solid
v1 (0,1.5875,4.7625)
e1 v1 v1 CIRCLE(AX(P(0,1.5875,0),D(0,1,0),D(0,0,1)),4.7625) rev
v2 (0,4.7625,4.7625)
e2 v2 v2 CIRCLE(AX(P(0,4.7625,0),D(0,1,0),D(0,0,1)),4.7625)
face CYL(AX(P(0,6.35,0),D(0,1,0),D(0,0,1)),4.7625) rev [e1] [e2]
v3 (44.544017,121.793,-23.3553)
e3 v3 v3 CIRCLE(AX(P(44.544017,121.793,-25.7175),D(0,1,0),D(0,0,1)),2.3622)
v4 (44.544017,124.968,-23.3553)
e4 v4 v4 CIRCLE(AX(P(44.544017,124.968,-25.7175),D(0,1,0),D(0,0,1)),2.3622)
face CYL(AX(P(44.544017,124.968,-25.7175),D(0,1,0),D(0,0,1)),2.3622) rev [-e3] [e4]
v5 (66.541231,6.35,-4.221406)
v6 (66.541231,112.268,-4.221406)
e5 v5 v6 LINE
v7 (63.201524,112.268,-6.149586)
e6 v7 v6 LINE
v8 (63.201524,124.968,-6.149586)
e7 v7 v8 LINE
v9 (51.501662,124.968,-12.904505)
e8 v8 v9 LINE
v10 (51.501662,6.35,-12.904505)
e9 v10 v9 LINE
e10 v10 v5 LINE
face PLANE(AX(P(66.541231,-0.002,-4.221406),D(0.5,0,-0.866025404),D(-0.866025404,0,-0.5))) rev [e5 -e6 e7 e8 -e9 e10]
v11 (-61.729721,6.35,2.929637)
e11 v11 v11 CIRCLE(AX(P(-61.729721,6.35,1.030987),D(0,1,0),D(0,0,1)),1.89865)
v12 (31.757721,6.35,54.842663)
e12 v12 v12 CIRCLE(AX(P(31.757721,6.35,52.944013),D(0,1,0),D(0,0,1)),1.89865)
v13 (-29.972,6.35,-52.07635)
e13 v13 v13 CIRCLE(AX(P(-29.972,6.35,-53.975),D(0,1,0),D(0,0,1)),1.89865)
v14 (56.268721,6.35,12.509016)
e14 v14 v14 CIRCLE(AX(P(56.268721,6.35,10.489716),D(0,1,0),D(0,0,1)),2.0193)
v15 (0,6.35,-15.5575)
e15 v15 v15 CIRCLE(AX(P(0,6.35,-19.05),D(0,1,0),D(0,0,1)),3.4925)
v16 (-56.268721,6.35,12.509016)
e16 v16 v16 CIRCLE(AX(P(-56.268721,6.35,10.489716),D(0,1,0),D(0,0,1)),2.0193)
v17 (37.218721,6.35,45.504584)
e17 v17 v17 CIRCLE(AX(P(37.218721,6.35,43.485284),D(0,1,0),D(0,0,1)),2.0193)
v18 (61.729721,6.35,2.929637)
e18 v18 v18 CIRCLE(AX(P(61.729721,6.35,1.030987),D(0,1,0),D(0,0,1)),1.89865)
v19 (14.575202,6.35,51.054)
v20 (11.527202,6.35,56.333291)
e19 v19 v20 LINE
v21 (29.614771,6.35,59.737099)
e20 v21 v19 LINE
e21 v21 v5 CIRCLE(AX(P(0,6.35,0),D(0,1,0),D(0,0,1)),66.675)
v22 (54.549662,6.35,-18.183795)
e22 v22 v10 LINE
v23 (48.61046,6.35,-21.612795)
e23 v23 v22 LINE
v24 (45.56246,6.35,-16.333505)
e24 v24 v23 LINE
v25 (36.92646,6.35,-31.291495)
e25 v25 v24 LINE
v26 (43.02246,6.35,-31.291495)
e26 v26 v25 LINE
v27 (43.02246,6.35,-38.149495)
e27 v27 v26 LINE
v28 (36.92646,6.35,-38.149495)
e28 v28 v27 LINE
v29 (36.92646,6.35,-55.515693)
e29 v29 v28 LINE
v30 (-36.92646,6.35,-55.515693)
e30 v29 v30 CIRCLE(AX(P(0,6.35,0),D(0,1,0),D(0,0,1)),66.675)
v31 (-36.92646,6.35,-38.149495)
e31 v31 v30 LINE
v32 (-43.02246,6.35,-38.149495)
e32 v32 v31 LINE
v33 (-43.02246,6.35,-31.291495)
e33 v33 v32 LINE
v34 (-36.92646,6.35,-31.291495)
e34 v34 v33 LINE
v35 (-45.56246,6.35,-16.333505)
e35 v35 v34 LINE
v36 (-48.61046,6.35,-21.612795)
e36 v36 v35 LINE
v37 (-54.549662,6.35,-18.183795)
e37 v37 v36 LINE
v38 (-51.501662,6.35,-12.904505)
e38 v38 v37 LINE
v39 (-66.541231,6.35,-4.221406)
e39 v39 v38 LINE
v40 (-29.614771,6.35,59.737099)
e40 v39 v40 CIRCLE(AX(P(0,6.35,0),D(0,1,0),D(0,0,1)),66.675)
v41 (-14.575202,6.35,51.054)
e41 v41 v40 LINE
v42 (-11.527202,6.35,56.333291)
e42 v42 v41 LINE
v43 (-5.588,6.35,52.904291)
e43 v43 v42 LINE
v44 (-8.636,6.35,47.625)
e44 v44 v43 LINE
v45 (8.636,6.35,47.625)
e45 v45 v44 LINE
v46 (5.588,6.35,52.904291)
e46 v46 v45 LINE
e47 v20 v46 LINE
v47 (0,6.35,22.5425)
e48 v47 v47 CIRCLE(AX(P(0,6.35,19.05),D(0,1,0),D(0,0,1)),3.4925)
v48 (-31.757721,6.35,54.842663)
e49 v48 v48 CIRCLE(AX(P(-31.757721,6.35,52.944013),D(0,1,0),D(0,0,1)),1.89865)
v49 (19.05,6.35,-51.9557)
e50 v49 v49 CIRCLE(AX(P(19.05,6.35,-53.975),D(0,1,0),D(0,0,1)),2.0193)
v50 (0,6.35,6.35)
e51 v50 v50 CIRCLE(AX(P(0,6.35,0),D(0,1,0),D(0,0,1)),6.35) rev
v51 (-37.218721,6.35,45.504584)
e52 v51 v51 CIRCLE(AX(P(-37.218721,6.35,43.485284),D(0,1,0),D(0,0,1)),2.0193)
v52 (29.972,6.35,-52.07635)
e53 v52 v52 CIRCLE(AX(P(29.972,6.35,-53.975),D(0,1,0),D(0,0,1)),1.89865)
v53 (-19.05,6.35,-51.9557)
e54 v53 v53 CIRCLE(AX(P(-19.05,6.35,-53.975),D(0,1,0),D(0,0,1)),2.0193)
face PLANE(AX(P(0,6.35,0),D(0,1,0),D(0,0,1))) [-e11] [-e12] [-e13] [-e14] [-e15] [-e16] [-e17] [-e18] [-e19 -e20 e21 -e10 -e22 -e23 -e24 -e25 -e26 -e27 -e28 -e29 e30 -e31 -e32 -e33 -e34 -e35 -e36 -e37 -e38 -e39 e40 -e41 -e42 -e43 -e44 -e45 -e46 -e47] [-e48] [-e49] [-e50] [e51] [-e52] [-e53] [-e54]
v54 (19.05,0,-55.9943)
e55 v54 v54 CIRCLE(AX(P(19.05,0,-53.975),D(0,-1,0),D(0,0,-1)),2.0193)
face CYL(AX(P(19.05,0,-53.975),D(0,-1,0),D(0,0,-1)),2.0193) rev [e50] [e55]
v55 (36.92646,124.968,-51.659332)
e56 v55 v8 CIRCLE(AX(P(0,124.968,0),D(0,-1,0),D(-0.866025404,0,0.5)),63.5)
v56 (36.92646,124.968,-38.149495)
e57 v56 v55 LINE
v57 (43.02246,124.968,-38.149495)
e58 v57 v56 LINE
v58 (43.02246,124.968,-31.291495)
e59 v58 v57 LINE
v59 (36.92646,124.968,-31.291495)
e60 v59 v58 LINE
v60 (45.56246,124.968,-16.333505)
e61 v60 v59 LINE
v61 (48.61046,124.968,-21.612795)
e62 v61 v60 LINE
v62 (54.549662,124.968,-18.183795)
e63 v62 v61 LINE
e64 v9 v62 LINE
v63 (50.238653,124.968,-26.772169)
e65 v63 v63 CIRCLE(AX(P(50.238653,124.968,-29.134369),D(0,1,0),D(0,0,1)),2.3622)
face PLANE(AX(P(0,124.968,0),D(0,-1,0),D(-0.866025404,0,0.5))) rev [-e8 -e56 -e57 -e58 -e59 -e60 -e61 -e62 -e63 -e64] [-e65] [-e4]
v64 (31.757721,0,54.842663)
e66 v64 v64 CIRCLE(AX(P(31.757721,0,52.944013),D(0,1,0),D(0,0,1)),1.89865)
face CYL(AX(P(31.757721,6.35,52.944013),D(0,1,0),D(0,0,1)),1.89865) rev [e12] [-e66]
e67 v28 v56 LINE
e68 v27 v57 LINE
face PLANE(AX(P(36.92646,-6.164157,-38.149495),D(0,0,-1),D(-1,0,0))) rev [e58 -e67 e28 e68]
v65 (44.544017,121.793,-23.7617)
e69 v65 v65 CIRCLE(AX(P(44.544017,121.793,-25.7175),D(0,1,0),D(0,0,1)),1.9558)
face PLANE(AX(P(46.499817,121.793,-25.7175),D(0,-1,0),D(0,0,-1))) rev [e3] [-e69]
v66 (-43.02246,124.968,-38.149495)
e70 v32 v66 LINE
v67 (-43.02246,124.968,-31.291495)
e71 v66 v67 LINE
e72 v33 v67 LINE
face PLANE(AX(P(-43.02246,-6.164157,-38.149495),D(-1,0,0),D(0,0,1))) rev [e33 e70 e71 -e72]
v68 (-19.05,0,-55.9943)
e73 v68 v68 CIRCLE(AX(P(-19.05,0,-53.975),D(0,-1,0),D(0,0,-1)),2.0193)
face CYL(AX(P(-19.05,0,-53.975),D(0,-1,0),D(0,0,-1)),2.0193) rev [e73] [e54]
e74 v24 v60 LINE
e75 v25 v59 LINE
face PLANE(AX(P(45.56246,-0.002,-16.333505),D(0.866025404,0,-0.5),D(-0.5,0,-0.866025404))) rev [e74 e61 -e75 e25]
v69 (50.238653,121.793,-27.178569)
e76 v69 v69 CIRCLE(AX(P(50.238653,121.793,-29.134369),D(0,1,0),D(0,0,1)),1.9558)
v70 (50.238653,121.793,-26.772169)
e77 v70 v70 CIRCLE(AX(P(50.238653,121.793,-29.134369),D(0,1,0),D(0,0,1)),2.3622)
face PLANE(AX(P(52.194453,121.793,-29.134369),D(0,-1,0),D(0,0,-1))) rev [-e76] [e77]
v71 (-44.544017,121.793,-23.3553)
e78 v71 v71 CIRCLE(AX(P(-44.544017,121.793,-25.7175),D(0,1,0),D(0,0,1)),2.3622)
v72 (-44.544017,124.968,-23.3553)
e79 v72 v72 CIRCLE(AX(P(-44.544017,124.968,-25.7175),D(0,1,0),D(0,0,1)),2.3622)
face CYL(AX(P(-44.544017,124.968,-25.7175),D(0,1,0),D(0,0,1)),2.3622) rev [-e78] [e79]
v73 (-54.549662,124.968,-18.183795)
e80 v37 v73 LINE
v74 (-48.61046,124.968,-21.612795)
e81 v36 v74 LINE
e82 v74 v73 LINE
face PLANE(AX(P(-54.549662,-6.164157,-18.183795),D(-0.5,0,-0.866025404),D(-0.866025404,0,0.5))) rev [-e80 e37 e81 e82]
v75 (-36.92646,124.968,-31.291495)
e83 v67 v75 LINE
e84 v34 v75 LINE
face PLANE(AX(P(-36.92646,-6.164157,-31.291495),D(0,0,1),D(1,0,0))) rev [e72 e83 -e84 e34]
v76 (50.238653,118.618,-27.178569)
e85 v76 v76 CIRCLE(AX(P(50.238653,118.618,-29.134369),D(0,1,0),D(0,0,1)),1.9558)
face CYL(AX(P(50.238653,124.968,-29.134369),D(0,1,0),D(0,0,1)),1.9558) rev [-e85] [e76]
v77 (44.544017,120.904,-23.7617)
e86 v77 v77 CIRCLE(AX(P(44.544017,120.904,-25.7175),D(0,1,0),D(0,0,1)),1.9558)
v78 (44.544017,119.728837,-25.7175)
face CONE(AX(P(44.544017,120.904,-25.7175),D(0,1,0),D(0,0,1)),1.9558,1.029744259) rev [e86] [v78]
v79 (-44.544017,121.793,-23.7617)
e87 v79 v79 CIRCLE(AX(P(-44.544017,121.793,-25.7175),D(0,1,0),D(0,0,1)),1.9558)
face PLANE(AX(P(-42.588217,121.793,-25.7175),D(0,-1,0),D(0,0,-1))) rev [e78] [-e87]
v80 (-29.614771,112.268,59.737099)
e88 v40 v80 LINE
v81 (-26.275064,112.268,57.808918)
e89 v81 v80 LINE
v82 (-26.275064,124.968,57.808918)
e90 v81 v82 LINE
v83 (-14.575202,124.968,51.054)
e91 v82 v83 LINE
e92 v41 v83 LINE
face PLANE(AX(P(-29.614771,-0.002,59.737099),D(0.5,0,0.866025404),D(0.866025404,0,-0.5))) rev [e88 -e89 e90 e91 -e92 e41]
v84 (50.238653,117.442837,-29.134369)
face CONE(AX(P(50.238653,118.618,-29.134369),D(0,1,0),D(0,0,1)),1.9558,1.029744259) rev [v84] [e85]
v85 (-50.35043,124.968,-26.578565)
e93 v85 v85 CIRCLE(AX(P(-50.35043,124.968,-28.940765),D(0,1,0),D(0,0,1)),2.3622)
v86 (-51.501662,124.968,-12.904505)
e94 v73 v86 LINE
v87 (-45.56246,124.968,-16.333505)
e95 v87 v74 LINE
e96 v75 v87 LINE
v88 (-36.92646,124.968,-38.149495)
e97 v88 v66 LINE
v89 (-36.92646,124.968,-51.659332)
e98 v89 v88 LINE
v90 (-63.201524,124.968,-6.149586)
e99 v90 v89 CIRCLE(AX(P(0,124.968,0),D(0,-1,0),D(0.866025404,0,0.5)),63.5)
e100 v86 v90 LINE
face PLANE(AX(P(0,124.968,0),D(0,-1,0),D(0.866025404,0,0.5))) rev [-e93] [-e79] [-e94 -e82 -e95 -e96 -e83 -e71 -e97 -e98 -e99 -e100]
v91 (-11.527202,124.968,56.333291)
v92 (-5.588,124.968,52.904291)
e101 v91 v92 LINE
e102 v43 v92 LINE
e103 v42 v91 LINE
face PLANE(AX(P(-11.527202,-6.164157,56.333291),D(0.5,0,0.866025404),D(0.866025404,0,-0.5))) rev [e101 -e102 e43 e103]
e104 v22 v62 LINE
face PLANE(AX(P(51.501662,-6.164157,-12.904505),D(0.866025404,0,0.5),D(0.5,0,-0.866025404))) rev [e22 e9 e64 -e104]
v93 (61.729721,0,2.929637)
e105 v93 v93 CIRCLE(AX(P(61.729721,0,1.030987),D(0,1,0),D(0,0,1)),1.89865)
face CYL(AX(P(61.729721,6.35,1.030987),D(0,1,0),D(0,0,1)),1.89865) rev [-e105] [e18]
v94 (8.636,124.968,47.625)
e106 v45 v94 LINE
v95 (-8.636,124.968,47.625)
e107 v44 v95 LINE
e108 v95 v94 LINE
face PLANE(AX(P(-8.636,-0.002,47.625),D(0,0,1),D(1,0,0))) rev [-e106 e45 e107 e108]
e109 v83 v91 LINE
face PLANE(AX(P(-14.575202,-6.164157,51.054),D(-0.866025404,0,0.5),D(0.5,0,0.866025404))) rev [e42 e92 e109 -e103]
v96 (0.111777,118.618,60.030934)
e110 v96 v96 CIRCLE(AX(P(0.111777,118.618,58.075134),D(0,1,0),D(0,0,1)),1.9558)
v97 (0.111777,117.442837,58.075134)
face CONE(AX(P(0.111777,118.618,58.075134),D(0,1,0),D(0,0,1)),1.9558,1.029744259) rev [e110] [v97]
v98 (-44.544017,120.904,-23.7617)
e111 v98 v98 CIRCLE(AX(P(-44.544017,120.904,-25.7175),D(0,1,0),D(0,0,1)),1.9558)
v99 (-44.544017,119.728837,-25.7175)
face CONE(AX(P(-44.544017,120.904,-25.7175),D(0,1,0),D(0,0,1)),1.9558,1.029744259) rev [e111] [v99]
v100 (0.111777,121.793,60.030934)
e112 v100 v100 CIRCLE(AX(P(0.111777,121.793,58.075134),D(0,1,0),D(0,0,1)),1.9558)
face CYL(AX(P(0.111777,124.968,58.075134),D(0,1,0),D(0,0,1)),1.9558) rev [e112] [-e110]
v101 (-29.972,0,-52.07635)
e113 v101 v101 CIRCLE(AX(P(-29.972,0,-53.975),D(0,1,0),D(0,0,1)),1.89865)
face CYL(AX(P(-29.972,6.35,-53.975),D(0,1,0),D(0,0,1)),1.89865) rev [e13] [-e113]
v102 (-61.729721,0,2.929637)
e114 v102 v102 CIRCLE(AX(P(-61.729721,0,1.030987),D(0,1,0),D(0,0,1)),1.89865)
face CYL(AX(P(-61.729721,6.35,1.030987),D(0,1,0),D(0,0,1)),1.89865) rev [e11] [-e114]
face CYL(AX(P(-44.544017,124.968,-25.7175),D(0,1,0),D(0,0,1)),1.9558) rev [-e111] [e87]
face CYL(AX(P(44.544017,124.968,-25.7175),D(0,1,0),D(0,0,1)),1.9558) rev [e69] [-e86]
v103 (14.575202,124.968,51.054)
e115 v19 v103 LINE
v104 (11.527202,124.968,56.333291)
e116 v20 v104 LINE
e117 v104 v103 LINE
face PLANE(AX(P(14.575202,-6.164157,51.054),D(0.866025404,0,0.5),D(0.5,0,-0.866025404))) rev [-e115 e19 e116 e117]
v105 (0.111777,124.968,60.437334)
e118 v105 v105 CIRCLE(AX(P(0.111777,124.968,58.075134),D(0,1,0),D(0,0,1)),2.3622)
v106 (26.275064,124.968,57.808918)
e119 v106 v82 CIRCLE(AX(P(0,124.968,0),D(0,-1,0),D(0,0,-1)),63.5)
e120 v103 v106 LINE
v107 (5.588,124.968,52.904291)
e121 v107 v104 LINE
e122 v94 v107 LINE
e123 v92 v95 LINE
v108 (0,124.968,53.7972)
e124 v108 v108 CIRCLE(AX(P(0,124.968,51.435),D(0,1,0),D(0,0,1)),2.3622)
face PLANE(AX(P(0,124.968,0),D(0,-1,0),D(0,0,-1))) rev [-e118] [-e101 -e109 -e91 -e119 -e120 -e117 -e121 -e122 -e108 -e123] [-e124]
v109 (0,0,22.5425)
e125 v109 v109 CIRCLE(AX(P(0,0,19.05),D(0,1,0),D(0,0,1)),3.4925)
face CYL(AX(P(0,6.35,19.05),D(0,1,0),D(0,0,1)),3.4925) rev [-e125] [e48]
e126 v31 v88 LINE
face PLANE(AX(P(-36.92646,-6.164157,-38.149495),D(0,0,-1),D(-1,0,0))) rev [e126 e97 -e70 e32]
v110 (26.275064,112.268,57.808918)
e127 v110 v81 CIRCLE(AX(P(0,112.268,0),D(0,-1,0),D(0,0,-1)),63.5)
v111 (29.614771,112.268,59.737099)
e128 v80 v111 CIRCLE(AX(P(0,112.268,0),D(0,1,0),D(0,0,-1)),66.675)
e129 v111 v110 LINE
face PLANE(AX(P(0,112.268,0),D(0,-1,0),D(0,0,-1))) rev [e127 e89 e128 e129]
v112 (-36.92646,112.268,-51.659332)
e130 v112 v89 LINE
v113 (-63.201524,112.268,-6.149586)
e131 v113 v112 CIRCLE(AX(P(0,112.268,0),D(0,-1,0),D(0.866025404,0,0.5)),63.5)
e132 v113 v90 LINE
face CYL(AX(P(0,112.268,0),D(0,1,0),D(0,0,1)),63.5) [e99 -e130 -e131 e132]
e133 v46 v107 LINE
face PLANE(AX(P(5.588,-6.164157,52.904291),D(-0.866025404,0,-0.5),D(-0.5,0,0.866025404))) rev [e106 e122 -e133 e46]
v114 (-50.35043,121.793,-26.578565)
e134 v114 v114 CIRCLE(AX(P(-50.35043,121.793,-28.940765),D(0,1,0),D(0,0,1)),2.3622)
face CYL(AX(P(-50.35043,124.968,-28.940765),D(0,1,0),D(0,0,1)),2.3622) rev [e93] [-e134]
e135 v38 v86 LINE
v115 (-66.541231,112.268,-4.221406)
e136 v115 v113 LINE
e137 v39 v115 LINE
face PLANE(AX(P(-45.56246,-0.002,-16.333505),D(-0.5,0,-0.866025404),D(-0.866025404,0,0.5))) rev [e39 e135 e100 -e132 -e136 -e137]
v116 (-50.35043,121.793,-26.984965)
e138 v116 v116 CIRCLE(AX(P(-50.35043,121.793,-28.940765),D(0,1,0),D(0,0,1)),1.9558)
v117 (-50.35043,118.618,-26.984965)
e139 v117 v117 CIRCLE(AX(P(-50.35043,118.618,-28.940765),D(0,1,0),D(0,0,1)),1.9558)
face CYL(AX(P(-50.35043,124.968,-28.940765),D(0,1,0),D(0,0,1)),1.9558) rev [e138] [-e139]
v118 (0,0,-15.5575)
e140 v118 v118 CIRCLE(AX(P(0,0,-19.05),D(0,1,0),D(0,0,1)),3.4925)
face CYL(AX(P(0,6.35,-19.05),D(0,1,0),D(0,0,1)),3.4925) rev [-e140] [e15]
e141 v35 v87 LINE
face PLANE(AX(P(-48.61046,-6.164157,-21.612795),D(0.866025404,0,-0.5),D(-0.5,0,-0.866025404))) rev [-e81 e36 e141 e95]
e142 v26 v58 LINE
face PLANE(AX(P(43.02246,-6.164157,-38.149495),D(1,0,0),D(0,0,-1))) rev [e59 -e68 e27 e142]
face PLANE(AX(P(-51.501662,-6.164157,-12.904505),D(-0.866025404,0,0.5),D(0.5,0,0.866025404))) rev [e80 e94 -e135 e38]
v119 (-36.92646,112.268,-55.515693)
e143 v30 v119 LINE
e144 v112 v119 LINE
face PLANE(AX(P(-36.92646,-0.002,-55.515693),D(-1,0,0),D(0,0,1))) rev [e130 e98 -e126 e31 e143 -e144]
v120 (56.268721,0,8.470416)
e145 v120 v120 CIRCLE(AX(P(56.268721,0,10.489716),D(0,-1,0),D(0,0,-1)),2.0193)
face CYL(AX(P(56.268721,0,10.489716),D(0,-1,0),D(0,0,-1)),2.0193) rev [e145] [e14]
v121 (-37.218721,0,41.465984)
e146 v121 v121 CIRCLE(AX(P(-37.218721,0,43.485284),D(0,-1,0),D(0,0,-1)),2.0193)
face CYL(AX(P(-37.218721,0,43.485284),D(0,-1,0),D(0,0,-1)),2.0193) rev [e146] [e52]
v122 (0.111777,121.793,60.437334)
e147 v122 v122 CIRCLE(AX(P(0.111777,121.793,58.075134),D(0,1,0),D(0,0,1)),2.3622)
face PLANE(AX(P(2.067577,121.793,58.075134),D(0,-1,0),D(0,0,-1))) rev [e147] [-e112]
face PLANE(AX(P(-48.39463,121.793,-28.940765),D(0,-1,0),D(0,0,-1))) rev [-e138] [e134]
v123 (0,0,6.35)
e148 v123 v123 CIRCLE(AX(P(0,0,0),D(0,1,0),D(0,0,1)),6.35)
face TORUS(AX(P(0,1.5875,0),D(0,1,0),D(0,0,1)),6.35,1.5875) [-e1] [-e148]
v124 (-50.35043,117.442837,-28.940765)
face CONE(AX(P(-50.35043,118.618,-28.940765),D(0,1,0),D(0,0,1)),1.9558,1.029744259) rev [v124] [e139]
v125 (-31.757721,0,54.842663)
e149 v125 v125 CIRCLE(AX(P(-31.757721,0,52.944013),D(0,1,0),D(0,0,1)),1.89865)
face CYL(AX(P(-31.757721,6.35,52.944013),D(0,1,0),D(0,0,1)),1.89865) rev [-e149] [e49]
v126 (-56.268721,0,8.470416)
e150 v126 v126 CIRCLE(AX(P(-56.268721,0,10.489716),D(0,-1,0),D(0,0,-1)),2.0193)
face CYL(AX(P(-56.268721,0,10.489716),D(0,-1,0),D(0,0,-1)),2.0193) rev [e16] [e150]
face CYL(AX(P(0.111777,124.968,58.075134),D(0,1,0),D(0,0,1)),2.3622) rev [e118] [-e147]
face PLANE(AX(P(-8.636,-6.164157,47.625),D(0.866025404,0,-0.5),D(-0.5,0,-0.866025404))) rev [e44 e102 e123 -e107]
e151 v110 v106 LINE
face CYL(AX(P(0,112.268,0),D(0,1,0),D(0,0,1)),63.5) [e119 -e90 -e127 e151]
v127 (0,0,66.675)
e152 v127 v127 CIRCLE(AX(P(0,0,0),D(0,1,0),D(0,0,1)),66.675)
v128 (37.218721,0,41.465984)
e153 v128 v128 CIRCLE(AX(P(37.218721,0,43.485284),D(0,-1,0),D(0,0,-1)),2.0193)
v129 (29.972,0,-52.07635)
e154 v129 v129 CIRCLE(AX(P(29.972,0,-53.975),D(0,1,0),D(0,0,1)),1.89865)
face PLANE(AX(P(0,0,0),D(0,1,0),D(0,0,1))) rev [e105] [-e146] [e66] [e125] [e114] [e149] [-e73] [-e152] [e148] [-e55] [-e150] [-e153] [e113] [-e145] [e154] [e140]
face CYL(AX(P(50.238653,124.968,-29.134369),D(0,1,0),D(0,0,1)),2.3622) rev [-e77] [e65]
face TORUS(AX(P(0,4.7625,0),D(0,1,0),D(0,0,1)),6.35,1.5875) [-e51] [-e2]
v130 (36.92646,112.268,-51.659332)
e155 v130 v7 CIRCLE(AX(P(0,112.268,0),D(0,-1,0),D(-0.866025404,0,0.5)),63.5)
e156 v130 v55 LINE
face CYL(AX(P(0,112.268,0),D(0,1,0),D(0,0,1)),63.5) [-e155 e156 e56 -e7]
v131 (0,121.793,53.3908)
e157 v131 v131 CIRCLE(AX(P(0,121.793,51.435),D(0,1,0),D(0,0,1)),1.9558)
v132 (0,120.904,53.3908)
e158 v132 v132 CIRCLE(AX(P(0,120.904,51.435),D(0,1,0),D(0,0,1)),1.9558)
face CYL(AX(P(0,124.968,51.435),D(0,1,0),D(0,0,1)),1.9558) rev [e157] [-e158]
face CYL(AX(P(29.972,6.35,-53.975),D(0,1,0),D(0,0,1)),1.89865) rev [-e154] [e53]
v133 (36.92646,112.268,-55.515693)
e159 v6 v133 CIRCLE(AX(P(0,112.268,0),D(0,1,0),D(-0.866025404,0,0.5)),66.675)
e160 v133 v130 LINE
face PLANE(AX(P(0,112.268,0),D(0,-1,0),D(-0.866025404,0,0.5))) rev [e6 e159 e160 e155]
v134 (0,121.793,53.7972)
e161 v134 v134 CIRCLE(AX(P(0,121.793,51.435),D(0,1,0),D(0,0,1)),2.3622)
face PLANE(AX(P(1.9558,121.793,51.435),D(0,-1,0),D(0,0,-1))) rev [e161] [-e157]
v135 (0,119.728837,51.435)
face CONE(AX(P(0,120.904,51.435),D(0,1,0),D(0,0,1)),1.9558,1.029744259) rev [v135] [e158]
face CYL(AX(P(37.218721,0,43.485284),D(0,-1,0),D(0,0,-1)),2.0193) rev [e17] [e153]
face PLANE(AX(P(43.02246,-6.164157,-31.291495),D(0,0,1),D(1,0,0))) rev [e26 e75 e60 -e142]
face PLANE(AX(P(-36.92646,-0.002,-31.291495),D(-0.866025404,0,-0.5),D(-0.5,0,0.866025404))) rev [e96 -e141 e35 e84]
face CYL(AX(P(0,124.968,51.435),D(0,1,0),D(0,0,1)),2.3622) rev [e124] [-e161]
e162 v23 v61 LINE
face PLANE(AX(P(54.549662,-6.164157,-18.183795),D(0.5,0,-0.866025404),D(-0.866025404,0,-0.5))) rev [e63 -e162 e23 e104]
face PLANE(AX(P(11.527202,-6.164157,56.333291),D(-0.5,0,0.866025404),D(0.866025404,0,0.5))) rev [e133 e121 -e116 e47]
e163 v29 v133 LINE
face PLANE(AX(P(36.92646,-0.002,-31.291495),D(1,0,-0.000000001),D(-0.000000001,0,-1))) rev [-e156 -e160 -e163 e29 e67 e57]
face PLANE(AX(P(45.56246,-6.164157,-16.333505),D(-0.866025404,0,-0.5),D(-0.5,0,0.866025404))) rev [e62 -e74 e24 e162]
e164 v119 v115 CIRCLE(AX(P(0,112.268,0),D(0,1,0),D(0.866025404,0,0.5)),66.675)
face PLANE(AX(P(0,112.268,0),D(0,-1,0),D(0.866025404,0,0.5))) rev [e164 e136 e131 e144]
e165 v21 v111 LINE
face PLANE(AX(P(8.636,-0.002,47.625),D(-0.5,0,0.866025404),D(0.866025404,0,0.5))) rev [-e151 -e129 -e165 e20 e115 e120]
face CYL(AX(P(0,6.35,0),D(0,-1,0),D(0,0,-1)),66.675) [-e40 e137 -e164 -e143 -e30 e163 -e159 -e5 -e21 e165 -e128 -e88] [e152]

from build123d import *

# Parameters (mm, degrees)
SKETCH1_R             = 66.675
BOSS_EXTRUDE1_DEPTH   = 6.35
BOSS_EXTRUDE2_REACH   = 240.306
CIRPATTERN1_COUNT     = 3
CUT_EXTRUDE1_DEPTH    = 118.618
CIRPATTERN2_COUNT     = 3
CUT_EXTRUDE2_DEPTH    = 12.7
CIRPATTERN3_COUNT     = 3
HOLE1_D               = 4.0386
CIRPATTERN4_OUTLINE_R = 2.0193
CIRPATTERN4_DEPTH     = 6.35
HOLE2_D               = 9.525
FILLET1_R             = 1.5875
HOLE3_D               = 6.985
CIRPATTERN5_COUNT     = 3
HOLE5_D               = 3.7973
CIRPATTERN6_COUNT     = 3
CIRPATTERN7_COUNT     = 3


# Read off the part's stored shape, not the designer's step: CirPattern4
with BuildPart() as part:
    # Sketch1 → Boss-Extrude1 (new body)
    with BuildSketch(Plane(origin=(0, 0, 0), x_dir=(1, 0, 0), z_dir=(0, 1, 0))):
        with Locations(Location((0, 0, 0), (0, 0, 270))):
            Circle(SKETCH1_R)
    extrude(amount=BOSS_EXTRUDE1_DEPTH)

    # Sketch2 → Boss-Extrude2 (add, up to next)
    with BuildSketch(Plane(origin=(0, 124.968, -124.968), x_dir=(1, 0, 0), z_dir=(0, -1, 0)), mode=Mode.PRIVATE) as boss_extrude2_sk1:
        with BuildLine():
            Line((-29.614770643, 184.705098882), (-8.635999998, 172.593000013))
            Line((-8.635999998, 172.593000013), (8.636000002, 172.593000013))
            Line((8.636000002, 172.593000013), (29.61477065, 184.705098878))
            ThreePointArc((29.61477065, 184.705098878), (4e-09, 191.642999985), (-29.614770643, 184.705098882))
        make_face()
    boss_extrude2_tool1 = extrude(boss_extrude2_sk1.sketch, amount=BOSS_EXTRUDE2_REACH, mode=Mode.PRIVATE) - part.part
    boss_extrude2 = boss_extrude2_tool1.solids().sort_by_distance((0, 124.968, 57.682703))[0]
    add(boss_extrude2)

    # CirPattern1: Boss-Extrude2 ×3 about axis
    cirpattern1_axis = Axis((0, 0, 0), (0, 1, 0))
    for i in range(1, CIRPATTERN1_COUNT):
        add(boss_extrude2.rotate(cirpattern1_axis, i * 360 / CIRPATTERN1_COUNT))

    # Sketch4 → Cut-Extrude1 (cut)
    with BuildSketch(Plane(origin=(0, 124.968, 0), x_dir=(1, 0, 0), z_dir=(0, 1, 0))):
        Polygon((14.575202222, -51.054000013), (11.527202222, -56.333290875), (5.588000002, -52.904290875), (8.636000002, -47.625000013), align=None)
        Polygon((-14.575202225, -51.054000007), (-8.635999998, -47.625000013), (-5.587999998, -52.904290875), (-11.527202221, -56.333290877), align=None)
    cut_extrude1 = extrude(amount=-CUT_EXTRUDE1_DEPTH, mode=Mode.SUBTRACT)

    # CirPattern2: Cut-Extrude1 ×3 about axis
    cirpattern2_axis = Axis((0, 0, 0), (0, 1, 0))
    for i in range(1, CIRPATTERN2_COUNT):
        add(cut_extrude1.rotate(cirpattern2_axis, i * 360 / CIRPATTERN2_COUNT), mode=Mode.SUBTRACT)

    # Sketch5 → Cut-Extrude2 (cut)
    with BuildSketch(Plane(origin=(0, 124.968, 0), x_dir=(1, 0, 0), z_dir=(0, 1, 0))):
        with BuildLine():
            Line((29.61477065, -59.737098878), (26.275063747, -57.808918214))
            ThreePointArc((26.275063747, -57.808918214), (-4e-09, -63.5), (-26.275063755, -57.808918211))
            Line((-26.275063755, -57.808918211), (-29.614770643, -59.737098882))
            ThreePointArc((-29.614770643, -59.737098882), (4e-09, -66.674999985), (29.61477065, -59.737098878))
        make_face()
    cut_extrude2 = extrude(amount=-CUT_EXTRUDE2_DEPTH, mode=Mode.SUBTRACT)

    # CirPattern3: Cut-Extrude2 ×3 about axis
    cirpattern3_axis = Axis((0, 0, 0), (0, 1, 0))
    for i in range(1, CIRPATTERN3_COUNT):
        add(cut_extrude2.rotate(cirpattern3_axis, i * 360 / CIRPATTERN3_COUNT), mode=Mode.SUBTRACT)

    # Hole1 (through all)
    with Locations(Plane(origin=(0, 0, 0), x_dir=(-1, 0, 0), z_dir=(0, -1, 0))):
        with Locations((-19.05, 53.975), (19.05, 53.975)):
            Hole(HOLE1_D / 2)

    # CirPattern4 outline → CirPattern4 (cut)
    with BuildSketch(Plane(origin=(0, 0, 0), x_dir=(1, 0, 0), z_dir=(0, 1, 0))):
        with Locations((-37.218721169, -43.485283942)):
            Circle(CIRPATTERN4_OUTLINE_R)
        with Locations((-56.268721169, -10.489716058)):
            Circle(CIRPATTERN4_OUTLINE_R)
        with Locations((56.268721169, -10.489716058)):
            Circle(CIRPATTERN4_OUTLINE_R)
        with Locations((37.218721169, -43.485283942)):
            Circle(CIRPATTERN4_OUTLINE_R)
    extrude(amount=CIRPATTERN4_DEPTH, mode=Mode.SUBTRACT)

    # Hole2 (through all)
    with Locations(Plane(origin=(0, 6.35, 0), x_dir=(1, 0, 0), z_dir=(0, 1, 0))):
        with Locations((0, 0)):
            Hole(HOLE2_D / 2)

    # Fillet1
    fillet1_edges = [part.edges().sort_by_distance(p)[0] for p in [
        (4.7625, 6.35, 0),
        (4.7625, 0, 0),
    ]]
    fillet(fillet1_edges, radius=FILLET1_R)

    # Hole3 (through all)
    with Locations(Plane(origin=(0, 6.35, 0), x_dir=(1, 0, 0), z_dir=(0, 1, 0))):
        with Locations((0, 19.05), (0, -19.05)):
            Hole(HOLE3_D / 2)

    # Sketch19 → Hole4 (revolve, cut)
    with BuildSketch(Plane(origin=(-50.350429877, 124.968, -28.940765488), x_dir=(0, 0, 1), z_dir=(1, 0, 0))):
        Polygon((0, 0), (0, 7.525163199), (1.9558, 6.35), (1.9558, 3.175), (2.3622, 3.175), (2.3622, 0), align=None)
    hole4 = revolve(axis=Axis((-50.350429877, 131.318, -28.940765488), (0, -1, 0)), mode=Mode.SUBTRACT)

    # CirPattern5: Hole4 ×3 about axis
    cirpattern5_axis = Axis((0, 0, 0), (0, 1, 0))
    for i in range(1, CIRPATTERN5_COUNT):
        add(hole4.rotate(cirpattern5_axis, i * 360 / CIRPATTERN5_COUNT), mode=Mode.SUBTRACT)

    # Hole5 (through all)
    with Locations(Plane(origin=(0, 6.35, 0), x_dir=(1, 0, 0), z_dir=(0, 1, 0))):
        with Locations((-29.972, 53.975), (29.972, 53.975)):
            hole5 = Hole(HOLE5_D / 2)

    # CirPattern6: Hole5 ×3 about axis
    cirpattern6_axis = Axis((0, 0, 0), (0, 1, 0))
    for i in range(1, CIRPATTERN6_COUNT):
        add(hole5.rotate(cirpattern6_axis, i * 360 / CIRPATTERN6_COUNT), mode=Mode.SUBTRACT)

    # Sketch23 → Hole6 (revolve, cut)
    with BuildSketch(Plane(origin=(0, 124.968, 51.435), x_dir=(0, 0, 1), z_dir=(1, 0, 0))):
        Polygon((0, 0), (0, 5.239163199), (1.9558, 4.064), (1.9558, 3.175), (2.3622, 3.175), (2.3622, 0), align=None)
    hole6 = revolve(axis=Axis((0, 131.318, 51.435), (0, -1, 0)), mode=Mode.SUBTRACT)

    # CirPattern7: Hole6 ×3 about axis
    cirpattern7_axis = Axis((0, 0, 0), (0, 1, 0))
    for i in range(1, CIRPATTERN7_COUNT):
        add(hole6.rotate(cirpattern7_axis, i * 360 / CIRPATTERN7_COUNT), mode=Mode.SUBTRACT)


solid = part.part
